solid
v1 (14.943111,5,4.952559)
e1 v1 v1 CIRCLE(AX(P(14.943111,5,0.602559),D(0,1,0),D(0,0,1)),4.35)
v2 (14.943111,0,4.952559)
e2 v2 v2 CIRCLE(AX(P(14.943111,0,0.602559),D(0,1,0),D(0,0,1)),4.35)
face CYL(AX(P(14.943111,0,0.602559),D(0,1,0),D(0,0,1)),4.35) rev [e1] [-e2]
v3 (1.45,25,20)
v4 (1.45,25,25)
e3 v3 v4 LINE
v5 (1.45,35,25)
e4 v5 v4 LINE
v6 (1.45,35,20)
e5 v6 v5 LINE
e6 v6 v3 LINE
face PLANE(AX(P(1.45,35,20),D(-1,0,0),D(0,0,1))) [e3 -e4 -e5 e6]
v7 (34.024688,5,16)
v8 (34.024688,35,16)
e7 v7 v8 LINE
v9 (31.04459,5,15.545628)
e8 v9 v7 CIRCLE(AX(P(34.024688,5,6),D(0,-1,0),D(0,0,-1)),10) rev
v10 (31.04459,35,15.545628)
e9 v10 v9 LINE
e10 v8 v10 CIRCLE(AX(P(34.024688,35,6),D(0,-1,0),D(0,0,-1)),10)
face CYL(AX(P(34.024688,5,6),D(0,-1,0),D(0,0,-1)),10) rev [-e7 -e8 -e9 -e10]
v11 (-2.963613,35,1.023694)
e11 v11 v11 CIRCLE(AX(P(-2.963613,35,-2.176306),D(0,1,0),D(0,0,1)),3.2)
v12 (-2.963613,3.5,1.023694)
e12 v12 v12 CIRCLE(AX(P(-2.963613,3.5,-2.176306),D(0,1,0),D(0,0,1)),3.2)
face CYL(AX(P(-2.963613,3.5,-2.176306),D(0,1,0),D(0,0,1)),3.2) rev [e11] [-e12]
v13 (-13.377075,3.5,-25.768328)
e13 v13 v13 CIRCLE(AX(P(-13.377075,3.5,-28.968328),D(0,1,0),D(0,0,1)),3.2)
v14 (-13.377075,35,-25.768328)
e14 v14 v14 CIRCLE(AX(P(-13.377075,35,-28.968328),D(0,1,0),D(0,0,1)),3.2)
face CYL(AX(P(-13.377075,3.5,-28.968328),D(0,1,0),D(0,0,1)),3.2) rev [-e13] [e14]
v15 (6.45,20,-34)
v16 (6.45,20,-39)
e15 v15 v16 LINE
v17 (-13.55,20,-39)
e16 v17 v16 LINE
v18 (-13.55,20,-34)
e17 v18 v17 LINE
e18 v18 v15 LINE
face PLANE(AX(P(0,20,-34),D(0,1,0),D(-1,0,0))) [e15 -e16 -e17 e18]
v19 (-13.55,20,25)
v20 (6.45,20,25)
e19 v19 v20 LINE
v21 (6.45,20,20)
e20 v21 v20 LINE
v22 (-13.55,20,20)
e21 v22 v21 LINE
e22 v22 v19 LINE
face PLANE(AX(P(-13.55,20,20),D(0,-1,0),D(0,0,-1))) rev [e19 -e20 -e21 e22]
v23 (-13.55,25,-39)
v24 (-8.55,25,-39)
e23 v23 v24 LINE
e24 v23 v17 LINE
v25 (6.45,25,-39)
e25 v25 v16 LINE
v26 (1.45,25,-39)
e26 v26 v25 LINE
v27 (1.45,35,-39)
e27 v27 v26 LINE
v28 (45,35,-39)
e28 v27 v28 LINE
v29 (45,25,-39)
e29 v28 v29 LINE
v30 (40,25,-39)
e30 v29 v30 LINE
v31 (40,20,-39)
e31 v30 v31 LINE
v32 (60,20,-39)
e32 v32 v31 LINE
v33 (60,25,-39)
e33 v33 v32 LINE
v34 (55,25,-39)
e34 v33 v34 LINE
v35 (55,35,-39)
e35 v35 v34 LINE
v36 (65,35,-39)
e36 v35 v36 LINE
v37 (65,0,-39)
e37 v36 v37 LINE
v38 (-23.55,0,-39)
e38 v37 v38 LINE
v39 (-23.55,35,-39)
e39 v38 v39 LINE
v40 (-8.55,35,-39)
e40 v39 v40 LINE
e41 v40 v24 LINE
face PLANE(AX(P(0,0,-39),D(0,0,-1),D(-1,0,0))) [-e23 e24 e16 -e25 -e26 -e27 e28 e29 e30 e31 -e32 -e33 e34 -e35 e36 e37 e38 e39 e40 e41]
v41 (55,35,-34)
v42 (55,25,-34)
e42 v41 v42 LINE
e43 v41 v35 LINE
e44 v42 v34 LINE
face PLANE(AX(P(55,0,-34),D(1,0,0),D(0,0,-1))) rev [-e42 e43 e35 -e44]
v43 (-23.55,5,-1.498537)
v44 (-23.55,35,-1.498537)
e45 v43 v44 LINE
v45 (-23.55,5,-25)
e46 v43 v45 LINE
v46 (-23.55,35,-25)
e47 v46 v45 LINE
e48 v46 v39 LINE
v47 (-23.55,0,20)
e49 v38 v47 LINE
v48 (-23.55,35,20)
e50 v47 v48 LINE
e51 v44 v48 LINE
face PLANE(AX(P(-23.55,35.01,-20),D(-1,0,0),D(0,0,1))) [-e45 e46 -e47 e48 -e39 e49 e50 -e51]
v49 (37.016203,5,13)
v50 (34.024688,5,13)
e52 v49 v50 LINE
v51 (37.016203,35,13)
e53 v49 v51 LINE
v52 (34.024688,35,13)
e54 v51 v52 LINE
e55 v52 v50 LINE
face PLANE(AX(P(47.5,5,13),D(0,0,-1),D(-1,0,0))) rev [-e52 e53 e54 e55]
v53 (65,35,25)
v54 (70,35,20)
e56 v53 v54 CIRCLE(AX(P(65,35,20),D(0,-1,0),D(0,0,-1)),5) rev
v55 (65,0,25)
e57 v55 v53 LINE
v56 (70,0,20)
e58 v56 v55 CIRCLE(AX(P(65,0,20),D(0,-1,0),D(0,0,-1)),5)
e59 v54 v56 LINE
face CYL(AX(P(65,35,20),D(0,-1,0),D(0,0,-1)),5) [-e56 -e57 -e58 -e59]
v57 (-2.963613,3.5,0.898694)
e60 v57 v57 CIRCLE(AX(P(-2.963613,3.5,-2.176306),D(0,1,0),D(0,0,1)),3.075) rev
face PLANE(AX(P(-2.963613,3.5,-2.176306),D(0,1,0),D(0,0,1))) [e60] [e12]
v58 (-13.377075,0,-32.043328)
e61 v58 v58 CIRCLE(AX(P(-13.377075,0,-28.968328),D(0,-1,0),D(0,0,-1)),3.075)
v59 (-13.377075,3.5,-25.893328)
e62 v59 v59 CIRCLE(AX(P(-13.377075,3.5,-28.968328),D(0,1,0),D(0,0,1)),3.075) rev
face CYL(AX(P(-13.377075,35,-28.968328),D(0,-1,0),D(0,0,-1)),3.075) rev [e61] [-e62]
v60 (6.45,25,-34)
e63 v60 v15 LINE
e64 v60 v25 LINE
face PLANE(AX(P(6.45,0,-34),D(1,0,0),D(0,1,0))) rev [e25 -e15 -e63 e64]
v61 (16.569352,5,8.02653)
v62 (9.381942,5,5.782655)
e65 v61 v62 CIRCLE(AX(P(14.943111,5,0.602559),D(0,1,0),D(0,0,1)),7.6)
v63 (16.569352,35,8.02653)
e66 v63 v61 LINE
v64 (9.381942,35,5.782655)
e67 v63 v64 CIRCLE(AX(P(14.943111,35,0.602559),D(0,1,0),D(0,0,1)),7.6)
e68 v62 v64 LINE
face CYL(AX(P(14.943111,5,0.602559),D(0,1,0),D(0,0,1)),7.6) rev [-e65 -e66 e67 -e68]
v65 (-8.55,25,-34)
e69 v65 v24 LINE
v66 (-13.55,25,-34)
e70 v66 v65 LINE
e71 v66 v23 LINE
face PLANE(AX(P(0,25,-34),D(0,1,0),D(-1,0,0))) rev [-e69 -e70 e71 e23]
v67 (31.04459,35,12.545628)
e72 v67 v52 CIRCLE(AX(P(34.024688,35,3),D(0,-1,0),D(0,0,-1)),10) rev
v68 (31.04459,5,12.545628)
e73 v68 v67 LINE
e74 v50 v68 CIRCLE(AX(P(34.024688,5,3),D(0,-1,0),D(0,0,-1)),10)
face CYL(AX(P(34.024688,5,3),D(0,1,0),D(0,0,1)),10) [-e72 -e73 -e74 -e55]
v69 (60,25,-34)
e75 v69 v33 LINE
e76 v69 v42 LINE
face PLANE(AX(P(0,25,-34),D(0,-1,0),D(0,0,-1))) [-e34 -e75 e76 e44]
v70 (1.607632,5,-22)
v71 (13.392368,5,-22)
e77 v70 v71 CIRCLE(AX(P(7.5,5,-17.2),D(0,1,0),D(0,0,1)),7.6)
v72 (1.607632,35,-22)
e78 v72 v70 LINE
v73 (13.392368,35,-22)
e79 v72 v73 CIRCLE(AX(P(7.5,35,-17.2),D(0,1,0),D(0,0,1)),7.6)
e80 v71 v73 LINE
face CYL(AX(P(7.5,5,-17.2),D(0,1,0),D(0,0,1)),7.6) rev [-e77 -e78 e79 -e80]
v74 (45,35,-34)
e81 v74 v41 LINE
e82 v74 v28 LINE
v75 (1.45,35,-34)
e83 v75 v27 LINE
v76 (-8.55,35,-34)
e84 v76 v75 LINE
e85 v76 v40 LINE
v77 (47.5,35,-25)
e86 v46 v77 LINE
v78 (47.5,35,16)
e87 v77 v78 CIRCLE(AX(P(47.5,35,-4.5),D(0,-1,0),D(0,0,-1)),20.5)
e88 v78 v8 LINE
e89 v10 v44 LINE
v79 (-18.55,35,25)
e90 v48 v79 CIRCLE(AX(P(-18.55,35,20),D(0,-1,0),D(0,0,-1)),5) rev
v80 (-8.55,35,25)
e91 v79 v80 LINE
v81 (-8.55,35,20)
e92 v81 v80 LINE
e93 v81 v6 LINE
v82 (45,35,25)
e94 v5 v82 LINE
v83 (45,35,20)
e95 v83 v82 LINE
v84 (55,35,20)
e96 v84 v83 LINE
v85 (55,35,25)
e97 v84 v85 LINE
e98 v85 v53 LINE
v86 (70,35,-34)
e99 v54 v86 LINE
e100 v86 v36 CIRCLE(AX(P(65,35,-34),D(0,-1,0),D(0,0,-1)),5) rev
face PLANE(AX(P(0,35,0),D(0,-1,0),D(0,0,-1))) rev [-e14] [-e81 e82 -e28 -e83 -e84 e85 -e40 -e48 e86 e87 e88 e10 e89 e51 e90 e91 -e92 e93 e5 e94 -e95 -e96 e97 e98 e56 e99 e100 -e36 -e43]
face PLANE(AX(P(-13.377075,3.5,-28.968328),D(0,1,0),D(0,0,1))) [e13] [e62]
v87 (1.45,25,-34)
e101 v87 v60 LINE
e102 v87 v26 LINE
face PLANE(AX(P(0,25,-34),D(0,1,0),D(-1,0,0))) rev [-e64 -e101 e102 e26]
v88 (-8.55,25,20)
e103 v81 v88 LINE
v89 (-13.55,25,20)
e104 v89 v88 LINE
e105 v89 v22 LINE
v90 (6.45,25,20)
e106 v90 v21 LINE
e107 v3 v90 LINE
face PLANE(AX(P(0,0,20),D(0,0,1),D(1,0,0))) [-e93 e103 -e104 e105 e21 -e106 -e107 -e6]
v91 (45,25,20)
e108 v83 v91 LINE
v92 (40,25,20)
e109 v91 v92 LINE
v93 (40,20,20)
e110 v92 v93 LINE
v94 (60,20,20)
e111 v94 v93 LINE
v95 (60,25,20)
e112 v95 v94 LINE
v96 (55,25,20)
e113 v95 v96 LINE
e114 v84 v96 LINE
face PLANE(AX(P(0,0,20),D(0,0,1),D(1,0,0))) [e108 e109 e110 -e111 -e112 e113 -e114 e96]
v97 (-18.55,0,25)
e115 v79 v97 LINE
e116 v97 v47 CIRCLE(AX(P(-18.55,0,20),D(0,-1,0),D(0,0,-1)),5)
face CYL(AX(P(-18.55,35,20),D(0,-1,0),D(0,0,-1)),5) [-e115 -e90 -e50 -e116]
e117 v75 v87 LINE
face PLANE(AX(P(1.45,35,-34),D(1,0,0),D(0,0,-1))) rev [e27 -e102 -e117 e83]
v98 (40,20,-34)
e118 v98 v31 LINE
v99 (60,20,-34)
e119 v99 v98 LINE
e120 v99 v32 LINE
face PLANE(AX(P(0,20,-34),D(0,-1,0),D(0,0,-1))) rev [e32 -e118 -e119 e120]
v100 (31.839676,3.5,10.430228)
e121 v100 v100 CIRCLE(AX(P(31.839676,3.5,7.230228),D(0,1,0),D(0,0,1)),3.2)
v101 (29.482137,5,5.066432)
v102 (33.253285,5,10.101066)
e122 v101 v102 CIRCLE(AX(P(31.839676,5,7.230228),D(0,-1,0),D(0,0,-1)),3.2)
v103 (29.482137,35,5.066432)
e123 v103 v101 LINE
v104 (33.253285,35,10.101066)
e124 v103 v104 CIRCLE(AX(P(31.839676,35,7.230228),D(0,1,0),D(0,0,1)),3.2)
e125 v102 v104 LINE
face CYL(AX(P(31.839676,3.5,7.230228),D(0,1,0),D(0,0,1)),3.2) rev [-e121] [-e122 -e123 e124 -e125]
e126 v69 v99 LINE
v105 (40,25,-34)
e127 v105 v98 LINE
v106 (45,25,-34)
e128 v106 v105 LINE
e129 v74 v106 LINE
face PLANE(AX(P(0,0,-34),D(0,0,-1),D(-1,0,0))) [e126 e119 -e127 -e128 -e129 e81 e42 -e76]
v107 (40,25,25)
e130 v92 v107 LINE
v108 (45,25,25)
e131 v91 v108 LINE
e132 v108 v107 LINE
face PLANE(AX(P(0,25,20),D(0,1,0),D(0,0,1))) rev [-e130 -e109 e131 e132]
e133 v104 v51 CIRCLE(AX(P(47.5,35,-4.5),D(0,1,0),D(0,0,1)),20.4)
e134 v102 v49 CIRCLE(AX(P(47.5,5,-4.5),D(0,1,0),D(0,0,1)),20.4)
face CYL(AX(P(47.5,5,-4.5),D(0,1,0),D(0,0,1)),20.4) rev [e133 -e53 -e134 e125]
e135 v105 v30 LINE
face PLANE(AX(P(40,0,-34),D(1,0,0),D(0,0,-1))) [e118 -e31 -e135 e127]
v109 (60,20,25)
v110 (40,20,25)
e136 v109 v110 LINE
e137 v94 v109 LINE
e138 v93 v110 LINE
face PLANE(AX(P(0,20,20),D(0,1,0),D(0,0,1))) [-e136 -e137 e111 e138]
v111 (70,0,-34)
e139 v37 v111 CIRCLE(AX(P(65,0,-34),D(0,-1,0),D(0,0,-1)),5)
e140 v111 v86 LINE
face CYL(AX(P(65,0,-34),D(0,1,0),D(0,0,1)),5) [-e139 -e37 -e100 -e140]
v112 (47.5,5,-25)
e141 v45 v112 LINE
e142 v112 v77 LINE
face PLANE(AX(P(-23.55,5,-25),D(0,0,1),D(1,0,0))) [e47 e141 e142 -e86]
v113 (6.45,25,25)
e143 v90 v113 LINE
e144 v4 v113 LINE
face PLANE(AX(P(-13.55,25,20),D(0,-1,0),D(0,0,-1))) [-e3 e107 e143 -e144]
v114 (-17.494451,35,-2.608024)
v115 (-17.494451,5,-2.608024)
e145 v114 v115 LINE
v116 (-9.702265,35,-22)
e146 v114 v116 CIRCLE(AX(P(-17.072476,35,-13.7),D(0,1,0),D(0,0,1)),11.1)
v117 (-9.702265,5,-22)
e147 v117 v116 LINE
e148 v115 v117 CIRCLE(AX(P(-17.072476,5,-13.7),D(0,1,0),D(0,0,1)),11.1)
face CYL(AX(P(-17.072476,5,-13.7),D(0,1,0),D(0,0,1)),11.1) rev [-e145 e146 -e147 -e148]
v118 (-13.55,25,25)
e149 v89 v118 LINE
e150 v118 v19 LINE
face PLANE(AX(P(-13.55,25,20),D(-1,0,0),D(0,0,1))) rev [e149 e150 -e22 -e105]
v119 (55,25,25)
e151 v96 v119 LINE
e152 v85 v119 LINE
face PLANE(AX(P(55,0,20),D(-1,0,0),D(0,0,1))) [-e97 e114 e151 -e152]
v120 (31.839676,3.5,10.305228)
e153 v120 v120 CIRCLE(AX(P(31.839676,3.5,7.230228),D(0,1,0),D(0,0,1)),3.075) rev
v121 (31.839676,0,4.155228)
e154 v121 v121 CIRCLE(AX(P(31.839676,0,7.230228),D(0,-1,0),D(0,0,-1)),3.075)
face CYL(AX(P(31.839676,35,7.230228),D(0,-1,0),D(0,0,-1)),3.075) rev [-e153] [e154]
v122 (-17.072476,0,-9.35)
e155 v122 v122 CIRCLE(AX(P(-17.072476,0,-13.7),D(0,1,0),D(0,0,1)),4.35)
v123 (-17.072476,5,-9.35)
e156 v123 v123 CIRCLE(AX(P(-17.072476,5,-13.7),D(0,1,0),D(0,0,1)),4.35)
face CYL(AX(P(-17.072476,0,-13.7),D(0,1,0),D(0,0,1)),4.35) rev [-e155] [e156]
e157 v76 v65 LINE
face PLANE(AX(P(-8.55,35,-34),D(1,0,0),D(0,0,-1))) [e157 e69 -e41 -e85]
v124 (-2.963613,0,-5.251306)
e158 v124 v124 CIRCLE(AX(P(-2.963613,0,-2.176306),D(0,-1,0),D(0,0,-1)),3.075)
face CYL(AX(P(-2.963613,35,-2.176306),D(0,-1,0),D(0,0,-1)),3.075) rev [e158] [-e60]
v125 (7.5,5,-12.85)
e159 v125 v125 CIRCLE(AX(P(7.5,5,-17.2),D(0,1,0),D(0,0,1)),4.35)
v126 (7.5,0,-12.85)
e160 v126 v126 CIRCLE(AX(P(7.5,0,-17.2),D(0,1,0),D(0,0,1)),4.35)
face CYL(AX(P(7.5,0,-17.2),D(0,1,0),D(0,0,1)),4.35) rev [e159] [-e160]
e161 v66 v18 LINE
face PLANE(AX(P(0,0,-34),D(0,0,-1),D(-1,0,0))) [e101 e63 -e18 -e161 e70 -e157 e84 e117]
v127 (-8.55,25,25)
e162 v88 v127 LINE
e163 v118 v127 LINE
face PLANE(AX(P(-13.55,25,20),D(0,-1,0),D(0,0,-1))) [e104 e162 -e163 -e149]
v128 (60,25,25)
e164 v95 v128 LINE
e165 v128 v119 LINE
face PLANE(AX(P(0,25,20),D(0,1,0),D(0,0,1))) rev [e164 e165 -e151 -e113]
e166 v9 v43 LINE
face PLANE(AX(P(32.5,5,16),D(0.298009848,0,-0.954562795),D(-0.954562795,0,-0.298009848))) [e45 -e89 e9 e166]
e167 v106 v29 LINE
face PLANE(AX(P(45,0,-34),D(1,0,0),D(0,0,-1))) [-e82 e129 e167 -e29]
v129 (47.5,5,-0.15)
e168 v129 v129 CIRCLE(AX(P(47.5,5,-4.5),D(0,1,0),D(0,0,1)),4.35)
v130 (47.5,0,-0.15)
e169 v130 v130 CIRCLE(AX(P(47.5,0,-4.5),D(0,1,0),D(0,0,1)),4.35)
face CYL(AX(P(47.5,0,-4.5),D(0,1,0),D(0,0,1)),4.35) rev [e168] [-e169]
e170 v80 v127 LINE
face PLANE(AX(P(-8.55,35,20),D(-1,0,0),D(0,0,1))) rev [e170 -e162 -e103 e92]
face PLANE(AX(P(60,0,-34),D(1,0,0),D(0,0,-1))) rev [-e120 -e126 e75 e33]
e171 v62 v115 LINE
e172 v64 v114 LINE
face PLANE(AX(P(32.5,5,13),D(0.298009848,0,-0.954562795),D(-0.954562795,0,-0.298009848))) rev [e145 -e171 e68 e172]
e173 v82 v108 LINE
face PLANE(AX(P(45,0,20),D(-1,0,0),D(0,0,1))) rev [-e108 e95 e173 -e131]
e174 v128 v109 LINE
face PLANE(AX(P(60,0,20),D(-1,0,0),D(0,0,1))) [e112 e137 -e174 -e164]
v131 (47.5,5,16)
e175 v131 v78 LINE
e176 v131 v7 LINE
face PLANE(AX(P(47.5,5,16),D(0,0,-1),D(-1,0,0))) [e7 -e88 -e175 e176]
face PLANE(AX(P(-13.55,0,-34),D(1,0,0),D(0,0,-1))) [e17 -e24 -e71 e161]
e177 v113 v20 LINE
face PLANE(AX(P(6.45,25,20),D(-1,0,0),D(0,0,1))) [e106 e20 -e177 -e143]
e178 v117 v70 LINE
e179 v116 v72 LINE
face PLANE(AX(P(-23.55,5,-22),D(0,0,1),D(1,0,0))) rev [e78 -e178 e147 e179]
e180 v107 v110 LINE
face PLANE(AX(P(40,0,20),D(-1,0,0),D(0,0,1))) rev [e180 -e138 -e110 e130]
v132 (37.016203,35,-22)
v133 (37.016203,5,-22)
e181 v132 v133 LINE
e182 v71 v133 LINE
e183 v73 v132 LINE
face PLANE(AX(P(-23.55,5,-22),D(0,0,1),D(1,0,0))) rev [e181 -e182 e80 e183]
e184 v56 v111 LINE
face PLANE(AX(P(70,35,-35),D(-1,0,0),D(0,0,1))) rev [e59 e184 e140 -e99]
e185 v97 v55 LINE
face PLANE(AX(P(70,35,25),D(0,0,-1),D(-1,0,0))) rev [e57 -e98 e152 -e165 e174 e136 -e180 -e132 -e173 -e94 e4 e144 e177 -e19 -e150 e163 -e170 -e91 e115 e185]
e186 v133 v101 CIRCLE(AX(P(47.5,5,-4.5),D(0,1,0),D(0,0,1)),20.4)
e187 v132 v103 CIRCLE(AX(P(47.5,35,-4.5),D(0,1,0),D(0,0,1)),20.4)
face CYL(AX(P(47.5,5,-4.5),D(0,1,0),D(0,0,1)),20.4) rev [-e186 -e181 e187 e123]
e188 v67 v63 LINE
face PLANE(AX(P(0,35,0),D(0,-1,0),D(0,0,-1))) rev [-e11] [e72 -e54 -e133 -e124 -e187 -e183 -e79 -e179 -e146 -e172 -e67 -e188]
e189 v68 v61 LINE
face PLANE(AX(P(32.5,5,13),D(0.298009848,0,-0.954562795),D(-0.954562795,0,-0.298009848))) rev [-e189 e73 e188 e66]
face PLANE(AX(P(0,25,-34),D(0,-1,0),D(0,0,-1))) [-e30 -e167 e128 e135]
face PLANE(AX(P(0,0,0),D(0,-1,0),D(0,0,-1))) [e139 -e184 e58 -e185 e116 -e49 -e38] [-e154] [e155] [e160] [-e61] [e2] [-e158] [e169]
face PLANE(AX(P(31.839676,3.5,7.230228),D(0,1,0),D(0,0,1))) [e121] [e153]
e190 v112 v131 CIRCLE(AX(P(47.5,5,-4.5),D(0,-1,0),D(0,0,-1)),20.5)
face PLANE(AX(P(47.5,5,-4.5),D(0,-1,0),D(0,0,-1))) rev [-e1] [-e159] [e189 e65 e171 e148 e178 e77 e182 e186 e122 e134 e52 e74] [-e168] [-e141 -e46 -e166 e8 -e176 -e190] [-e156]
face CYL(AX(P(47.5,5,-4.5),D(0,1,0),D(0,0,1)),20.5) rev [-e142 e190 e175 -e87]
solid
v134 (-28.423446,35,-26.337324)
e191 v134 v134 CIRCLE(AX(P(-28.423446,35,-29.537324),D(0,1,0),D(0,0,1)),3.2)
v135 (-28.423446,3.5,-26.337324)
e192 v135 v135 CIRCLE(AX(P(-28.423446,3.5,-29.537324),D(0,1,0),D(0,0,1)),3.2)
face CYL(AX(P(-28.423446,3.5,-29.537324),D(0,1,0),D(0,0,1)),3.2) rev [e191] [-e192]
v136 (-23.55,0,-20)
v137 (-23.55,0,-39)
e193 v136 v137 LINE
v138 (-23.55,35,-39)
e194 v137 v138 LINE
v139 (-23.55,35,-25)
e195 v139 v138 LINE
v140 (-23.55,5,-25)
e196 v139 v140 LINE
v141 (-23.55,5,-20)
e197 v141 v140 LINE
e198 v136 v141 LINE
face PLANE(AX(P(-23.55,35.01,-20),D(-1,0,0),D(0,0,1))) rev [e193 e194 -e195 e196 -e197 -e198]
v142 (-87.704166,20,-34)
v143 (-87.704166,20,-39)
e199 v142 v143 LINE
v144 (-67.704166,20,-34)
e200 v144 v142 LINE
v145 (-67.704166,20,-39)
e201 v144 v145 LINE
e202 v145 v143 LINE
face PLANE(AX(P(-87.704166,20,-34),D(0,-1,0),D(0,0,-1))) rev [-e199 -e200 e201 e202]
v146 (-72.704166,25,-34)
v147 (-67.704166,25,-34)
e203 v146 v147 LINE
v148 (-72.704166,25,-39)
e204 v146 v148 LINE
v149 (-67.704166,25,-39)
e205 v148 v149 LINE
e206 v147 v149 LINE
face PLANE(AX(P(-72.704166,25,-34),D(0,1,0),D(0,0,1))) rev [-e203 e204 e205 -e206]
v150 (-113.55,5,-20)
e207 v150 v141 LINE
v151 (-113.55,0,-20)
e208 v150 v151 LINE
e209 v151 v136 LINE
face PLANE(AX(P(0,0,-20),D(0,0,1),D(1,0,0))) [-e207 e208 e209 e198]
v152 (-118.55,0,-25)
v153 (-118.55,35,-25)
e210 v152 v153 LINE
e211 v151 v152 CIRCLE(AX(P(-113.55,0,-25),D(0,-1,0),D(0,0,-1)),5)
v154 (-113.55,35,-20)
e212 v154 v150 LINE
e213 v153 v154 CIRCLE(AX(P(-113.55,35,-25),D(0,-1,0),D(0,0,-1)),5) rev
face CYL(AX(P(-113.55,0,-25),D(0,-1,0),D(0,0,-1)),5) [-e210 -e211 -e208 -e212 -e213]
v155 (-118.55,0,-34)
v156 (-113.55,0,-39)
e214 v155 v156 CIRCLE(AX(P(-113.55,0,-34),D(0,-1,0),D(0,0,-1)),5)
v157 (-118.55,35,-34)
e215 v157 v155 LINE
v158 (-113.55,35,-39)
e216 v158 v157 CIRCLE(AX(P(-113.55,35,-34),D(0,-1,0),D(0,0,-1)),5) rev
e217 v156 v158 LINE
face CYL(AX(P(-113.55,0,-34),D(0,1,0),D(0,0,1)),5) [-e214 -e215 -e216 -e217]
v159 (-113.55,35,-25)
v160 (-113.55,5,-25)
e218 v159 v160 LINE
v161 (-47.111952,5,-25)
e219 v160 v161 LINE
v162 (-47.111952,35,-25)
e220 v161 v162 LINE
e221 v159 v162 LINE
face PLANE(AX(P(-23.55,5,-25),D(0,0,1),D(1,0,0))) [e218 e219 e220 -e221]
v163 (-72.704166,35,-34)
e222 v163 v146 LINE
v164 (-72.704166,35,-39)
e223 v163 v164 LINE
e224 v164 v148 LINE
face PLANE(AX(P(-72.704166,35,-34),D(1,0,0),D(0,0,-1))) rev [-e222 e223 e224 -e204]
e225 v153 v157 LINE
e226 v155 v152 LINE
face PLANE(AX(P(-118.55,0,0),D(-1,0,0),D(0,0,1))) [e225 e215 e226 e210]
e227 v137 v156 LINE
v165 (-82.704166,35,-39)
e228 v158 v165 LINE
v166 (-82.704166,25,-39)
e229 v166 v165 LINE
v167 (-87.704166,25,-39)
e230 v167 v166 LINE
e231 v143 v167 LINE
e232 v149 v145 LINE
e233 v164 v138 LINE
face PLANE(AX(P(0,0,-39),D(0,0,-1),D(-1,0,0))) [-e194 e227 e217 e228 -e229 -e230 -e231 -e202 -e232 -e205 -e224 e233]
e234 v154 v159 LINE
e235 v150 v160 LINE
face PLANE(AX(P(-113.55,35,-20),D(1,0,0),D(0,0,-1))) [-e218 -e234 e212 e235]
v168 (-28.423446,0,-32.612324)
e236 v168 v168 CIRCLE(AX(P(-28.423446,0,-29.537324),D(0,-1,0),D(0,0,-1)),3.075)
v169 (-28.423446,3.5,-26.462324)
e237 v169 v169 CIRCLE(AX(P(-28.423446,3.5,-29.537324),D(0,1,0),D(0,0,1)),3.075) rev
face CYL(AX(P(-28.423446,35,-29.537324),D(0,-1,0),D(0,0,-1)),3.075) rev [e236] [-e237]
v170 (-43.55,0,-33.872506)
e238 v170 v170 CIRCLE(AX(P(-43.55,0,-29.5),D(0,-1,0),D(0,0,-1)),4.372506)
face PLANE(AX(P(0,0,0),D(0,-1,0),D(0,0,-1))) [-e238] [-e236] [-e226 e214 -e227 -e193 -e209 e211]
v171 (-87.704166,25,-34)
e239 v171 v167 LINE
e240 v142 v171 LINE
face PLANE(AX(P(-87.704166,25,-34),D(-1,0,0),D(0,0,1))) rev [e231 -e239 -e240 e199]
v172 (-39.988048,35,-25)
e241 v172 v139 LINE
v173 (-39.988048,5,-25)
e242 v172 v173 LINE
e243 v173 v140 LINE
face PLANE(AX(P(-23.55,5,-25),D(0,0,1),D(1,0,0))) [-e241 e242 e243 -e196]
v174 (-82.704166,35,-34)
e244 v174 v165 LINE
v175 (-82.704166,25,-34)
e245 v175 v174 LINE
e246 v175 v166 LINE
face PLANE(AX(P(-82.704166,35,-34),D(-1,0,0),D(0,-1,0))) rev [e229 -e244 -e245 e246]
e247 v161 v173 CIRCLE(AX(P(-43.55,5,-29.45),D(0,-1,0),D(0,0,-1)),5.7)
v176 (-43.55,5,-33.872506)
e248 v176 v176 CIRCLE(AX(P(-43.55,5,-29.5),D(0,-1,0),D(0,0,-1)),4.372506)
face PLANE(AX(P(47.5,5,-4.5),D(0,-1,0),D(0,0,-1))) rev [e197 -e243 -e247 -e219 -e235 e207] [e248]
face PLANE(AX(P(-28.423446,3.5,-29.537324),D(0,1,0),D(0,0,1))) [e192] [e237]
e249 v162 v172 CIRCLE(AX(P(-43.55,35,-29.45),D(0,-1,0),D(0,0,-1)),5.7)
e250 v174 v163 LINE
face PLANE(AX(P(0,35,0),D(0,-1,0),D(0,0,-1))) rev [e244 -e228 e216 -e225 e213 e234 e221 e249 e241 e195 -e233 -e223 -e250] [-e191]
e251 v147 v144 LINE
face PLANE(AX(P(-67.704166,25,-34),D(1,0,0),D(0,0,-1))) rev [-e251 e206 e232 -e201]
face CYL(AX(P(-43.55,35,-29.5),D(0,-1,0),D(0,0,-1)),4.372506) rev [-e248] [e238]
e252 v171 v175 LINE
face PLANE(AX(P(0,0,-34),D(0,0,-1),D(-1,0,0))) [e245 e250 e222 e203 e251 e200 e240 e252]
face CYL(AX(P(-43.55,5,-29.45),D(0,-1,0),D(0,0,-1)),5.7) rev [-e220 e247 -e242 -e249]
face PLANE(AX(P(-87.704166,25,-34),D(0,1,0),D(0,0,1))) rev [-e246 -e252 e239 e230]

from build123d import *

# Parameters (mm, degrees)
SKETCH1_W               = 93.55
SKETCH1_H               = 60
BOSS_EXTRUDE1_DEPTH     = 35
CUT_EXTRUDE1_DEPTH      = 30
FILLET1_R               = 10
SKETCH3_R               = 20.4
SKETCH3_R_2             = 7.6
SKETCH3_R_3             = 11.1
CUT_EXTRUDE2_DEPTH      = 30
CUT_EXTRUDE3_DEPTH      = 30
SKETCH7_R               = 4.35
CUT_EXTRUDE4_DEPTH      = 84.815273071
SKETCH8_W               = 10
SKETCH8_H               = 10
SKETCH8_W_2             = 20
SKETCH8_H_2             = 5
CUT_EXTRUDE5_DEPTH      = 5
SKETCH11_W              = 35
SKETCH11_H              = 10
BOSS_EXTRUDE2_DEPTH     = 95
BOSS_EXTRUDE3_DEPTH     = 5
SKETCH14_W              = 2
SKETCH14_H              = 30
CUT_EXTRUDE7_DEPTH      = 4.45
SKETCH21_W              = 188.55
SKETCH21_H              = 35
BOSS_EXTRUDE4_DEPTH     = 4
CUT_REVOLVE_THIN1_START = 5
CUT_REVOLVE_THIN1_DEPTH = 30
SKETCH18_R              = 4.372505649
CUT_EXTRUDE8_DEPTH      = 130.61520937
CUT_EXTRUDE9_DEPTH      = 5
SKETCH10_W              = 20
SKETCH10_H              = 5
SKETCH10_W_2            = 10
SKETCH10_H_2            = 10
CUT_EXTRUDE6_DEPTH      = 5
FILLET2_R               = 5
SKETCH23_R              = 3.075
CUT_EXTRUDE10_DEPTH     = 130.61520937
SKETCH24_R              = 3.2
CUT_EXTRUDE11_DEPTH     = 31.5
SPLIT1_SURFACE_1_BACK   = 203.169
SPLIT1_SURFACE_1_DEPTH  = 406.338
SPLIT1_SURFACE_2_BACK   = 203.169
SPLIT1_SURFACE_2_DEPTH  = 406.338


# Read off the part's stored shape, not the designer's step: Cut-Revolve-Thin1
with BuildPart() as part:
    # Sketch1 → Boss-Extrude1 (new body)
    with BuildSketch(Plane(origin=(0, 0, 0), x_dir=(-1, 0, 0), z_dir=(0, 1, 0))):
        with Locations((-23.225, -5)):
            Rectangle(SKETCH1_W, SKETCH1_H)
    extrude(amount=BOSS_EXTRUDE1_DEPTH)

    # Sketch2 → Cut-Extrude1 (cut)
    with BuildSketch(Plane(origin=(0, 35, 0), x_dir=(-1, 0, 0), z_dir=(0, 1, 0))):
        with BuildLine():
            Line((23.55, -22), (-47.5, -22))
            ThreePointArc((-47.5, -22), (-65, -4.5), (-47.5, 13))
            Line((-47.5, 13), (-32.5, 13))
            Line((-32.5, 13), (23.55, -4.498536585))
            Line((23.55, -4.498536585), (23.55, -1.498536585))
            Line((23.55, -1.498536585), (-32.5, 16))
            Line((-32.5, 16), (-47.5, 16))
            ThreePointArc((-47.5, 16), (-68, -4.5), (-47.5, -25))
            Line((-47.5, -25), (23.55, -25))
            Line((23.55, -25), (23.55, -22))
        make_face()
    extrude(amount=-CUT_EXTRUDE1_DEPTH, mode=Mode.SUBTRACT)

    # Fillet1
    fillet1_edges = [part.edges().sort_by_distance(p)[0] for p in [
        (32.5, 20, 16),
        (32.5, 20, 13),
    ]]
    fillet(fillet1_edges, radius=FILLET1_R)

    # Sketch3 → Cut-Extrude2 (cut)
    with BuildSketch(Plane(origin=(0, 35, 0), x_dir=(-1, 0, 0), z_dir=(0, 1, 0))):
        with Locations((-47.5, -4.5)):
            Circle(SKETCH3_R)
        with Locations((-7.5, -17.2)):
            Circle(SKETCH3_R_2)
        with Locations((-14.943111192, 0.602558917)):
            Circle(SKETCH3_R_2)
        with Locations((17.072475727, -13.7)):
            Circle(SKETCH3_R_3)
    extrude(amount=-CUT_EXTRUDE2_DEPTH, mode=Mode.SUBTRACT)

    # Sketch4 → Cut-Extrude3 (cut)
    with BuildSketch(Plane(origin=(0, 35, 0), x_dir=(-1, 0, 0), z_dir=(0, 1, 0))):
        Polygon((23.036100787, -4.338099758), (23.55, -4.686028662), (23.55, -4.498536585), align=None)
    extrude(amount=-CUT_EXTRUDE3_DEPTH, mode=Mode.SUBTRACT)

    # Sketch7 → Cut-Extrude4 (cut, through all)
    with BuildSketch(Plane(origin=(0, 5, 0), x_dir=(-1, 0, 0), z_dir=(0, 1, 0))):
        with Locations(Location((-47.5, -4.5, 0), (0, 0, 90))):
            Circle(SKETCH7_R)
        with Locations(Location((-14.943111192, 0.602558917, 0), (0, 0, 90))):
            Circle(SKETCH7_R)
        with Locations(Location((-7.5, -17.2, 0), (0, 0, 90))):
            Circle(SKETCH7_R)
        with Locations(Location((17.072475727, -13.7, 0), (0, 0, 90))):
            Circle(SKETCH7_R)
    extrude(amount=-CUT_EXTRUDE4_DEPTH, mode=Mode.SUBTRACT)

    # Sketch8 → Cut-Extrude5 (cut)
    with BuildSketch(Plane.XY.offset(25)):
        with Locations((50, 30)):
            Rectangle(SKETCH8_W, SKETCH8_H)
        with Locations((50, 22.5)):
            Rectangle(SKETCH8_W_2, SKETCH8_H_2)
        with Locations((-3.55, 22.5)):
            Rectangle(SKETCH8_W_2, SKETCH8_H_2)
        with Locations((-3.55, 30)):
            Rectangle(SKETCH8_W, SKETCH8_H)
    extrude(amount=-CUT_EXTRUDE5_DEPTH, mode=Mode.SUBTRACT)

    # Sketch11 → Boss-Extrude2 (add)
    with BuildSketch(Plane(origin=(-23.55, 0, 0), x_dir=(0, -1, 0), z_dir=(-1, 0, 0))):
        with Locations((-17.5, -30)):
            Rectangle(SKETCH11_W, SKETCH11_H)
    extrude(amount=BOSS_EXTRUDE2_DEPTH)

    # Sketch12 → Boss-Extrude3 (add)
    with BuildSketch(Plane.XY.offset(-25)):
        Polygon((-113.55, 35), (-113.55, 5), (-23.55, 5), (-23.55, 0), (-118.55, 0), (-118.55, 35), align=None)
    extrude(amount=BOSS_EXTRUDE3_DEPTH)

    # Sketch14 → Cut-Extrude7 (cut)
    with BuildSketch(Plane.XY.offset(-25)):
        with Locations((-43.55, 20)):
            Rectangle(SKETCH14_W, SKETCH14_H)
    extrude(amount=-CUT_EXTRUDE7_DEPTH, mode=Mode.SUBTRACT)

    # Sketch21 → Boss-Extrude4 (add)
    with BuildSketch(Plane(origin=(0, 0, -35), x_dir=(1, 0, 0), z_dir=(0, 0, -1))):
        with Locations((-24.275, -17.5)):
            Rectangle(SKETCH21_W, SKETCH21_H)
    extrude(amount=BOSS_EXTRUDE4_DEPTH)

    # Cut-Revolve-Thin1 outline → Cut-Revolve-Thin1 (cut)
    with BuildSketch(Plane(origin=(0, 0, 0), x_dir=(1, 0, 0), z_dir=(0, 1, 0)).offset(CUT_REVOLVE_THIN1_START)):
        with BuildLine():
            ThreePointArc((-39.988048288, 25), (-43.55, 35.15), (-47.111951712, 25))
            Line((-47.111951712, 25), (-44.55, 25))
            Line((-44.55, 25), (-44.55, 29.45))
            Line((-44.55, 29.45), (-42.55, 29.45))
            Line((-42.55, 29.45), (-42.55, 25))
            Line((-42.55, 25), (-39.988048288, 25))
        make_face()
    extrude(amount=CUT_REVOLVE_THIN1_DEPTH, mode=Mode.SUBTRACT)

    # Sketch18 → Cut-Extrude8 (cut, through all)
    with BuildSketch(Plane.XZ):
        with Locations(Location((-43.55, -29.5, 0), (0, 0, 270))):
            Circle(SKETCH18_R)
    extrude(amount=-CUT_EXTRUDE8_DEPTH, mode=Mode.SUBTRACT)

    # Sketch19 → Cut-Extrude9 (cut)
    with BuildSketch(Plane(origin=(0, 0, -39), x_dir=(1, 0, 0), z_dir=(0, 0, -1))):
        Polygon((-87.704165959, -25), (-87.704165959, -20), (-67.704165959, -20), (-67.704165959, -25), (-72.704165959, -25), (-72.704165959, -35), (-82.704165959, -35), (-82.704165959, -25), align=None)
    extrude(amount=-CUT_EXTRUDE9_DEPTH, mode=Mode.SUBTRACT)

    # Sketch10 → Cut-Extrude6 (cut)
    with BuildSketch(Plane(origin=(0, 0, -39), x_dir=(-1, 0, 0), z_dir=(0, 0, -1))):
        with Locations((3.55, 22.5)):
            Rectangle(SKETCH10_W, SKETCH10_H)
        Polygon((-45, 25), (-55, 25), (-60, 25), (-60, 20), (-40, 20), (-40, 25), align=None)
        with Locations((-50, 30)):
            Rectangle(SKETCH10_W_2, SKETCH10_H_2)
        with Locations((3.55, 30)):
            Rectangle(SKETCH10_W_2, SKETCH10_H_2)
    extrude(amount=-CUT_EXTRUDE6_DEPTH, mode=Mode.SUBTRACT)

    # Fillet2
    fillet2_edges = [part.edges().sort_by_distance(p)[0] for p in [
        (-118.55, 17.5, -20),
        (-118.55, 17.5, -39),
        (70, 17.5, -39),
        (-23.55, 17.5, 25),
        (70, 17.5, 25),
    ]]
    fillet(fillet2_edges, radius=FILLET2_R)

    # Sketch23 → Cut-Extrude10 (cut, through all)
    with BuildSketch(Plane.XZ):
        with Locations(Location((-2.9636134, -2.17630607, 0), (0, 0, 270))):
            Circle(SKETCH23_R)
        with Locations(Location((31.83967628, 7.23022785, 0), (0, 0, 270))):
            Circle(SKETCH23_R)
        with Locations(Location((-13.37707505, -28.96832789, 0), (0, 0, 270))):
            Circle(SKETCH23_R)
        with Locations(Location((-28.42344593, -29.5373241, 0), (0, 0, 270))):
            Circle(SKETCH23_R)
    extrude(amount=-CUT_EXTRUDE10_DEPTH, mode=Mode.SUBTRACT)

    # Sketch24 → Cut-Extrude11 (cut)
    with BuildSketch(Plane(origin=(0, 35, 0), x_dir=(-1, 0, 0), z_dir=(0, 1, 0))):
        with Locations(Location((-31.83967628, 7.23022785, 0), (0, 0, 90))):
            Circle(SKETCH24_R)
        with Locations(Location((2.9636134, -2.17630607, 0), (0, 0, 90))):
            Circle(SKETCH24_R)
        with Locations(Location((13.37707505, -28.96832789, 0), (0, 0, 90))):
            Circle(SKETCH24_R)
        with Locations(Location((28.42344593, -29.5373241, 0), (0, 0, 90))):
            Circle(SKETCH24_R)
    extrude(amount=-CUT_EXTRUDE11_DEPTH, mode=Mode.SUBTRACT)


with BuildPart() as body_2:
    # Split1: the piece behind the surface
    add(part.part)
    # Split1 surface: a surface, the sketch's curves swept straight by 406.338 mm
    with BuildLine(Plane(origin=(0, 0, 0), x_dir=(-1, 0, 0), z_dir=(0, -1, 0)).offset(-SPLIT1_SURFACE_1_BACK), mode=Mode.PRIVATE) as split1_surface_1_path:
        Line((23.55, 20), (23.55, 39))
    split1_surface_1 = Shell.extrude(split1_surface_1_path.wire(), (0 * SPLIT1_SURFACE_1_DEPTH, -1 * SPLIT1_SURFACE_1_DEPTH, 0 * SPLIT1_SURFACE_1_DEPTH))
    split(bisect_by=split1_surface_1, keep=Keep.BOTTOM)


with BuildPart() as part_1:
    add(part.part)

    # Split1: split by a surface, the side it looks to stays
    # Split1 surface: a surface, the sketch's curves swept straight by 406.338 mm
    with BuildLine(Plane(origin=(0, 0, 0), x_dir=(-1, 0, 0), z_dir=(0, -1, 0)).offset(-SPLIT1_SURFACE_2_BACK), mode=Mode.PRIVATE) as split1_surface_2_path:
        Line((23.55, 20), (23.55, 39))
    split1_surface_2 = Shell.extrude(split1_surface_2_path.wire(), (0 * SPLIT1_SURFACE_2_DEPTH, -1 * SPLIT1_SURFACE_2_DEPTH, 0 * SPLIT1_SURFACE_2_DEPTH))
    split(bisect_by=split1_surface_2, keep=Keep.TOP)


solid = Compound([body_2.part, part_1.part])
